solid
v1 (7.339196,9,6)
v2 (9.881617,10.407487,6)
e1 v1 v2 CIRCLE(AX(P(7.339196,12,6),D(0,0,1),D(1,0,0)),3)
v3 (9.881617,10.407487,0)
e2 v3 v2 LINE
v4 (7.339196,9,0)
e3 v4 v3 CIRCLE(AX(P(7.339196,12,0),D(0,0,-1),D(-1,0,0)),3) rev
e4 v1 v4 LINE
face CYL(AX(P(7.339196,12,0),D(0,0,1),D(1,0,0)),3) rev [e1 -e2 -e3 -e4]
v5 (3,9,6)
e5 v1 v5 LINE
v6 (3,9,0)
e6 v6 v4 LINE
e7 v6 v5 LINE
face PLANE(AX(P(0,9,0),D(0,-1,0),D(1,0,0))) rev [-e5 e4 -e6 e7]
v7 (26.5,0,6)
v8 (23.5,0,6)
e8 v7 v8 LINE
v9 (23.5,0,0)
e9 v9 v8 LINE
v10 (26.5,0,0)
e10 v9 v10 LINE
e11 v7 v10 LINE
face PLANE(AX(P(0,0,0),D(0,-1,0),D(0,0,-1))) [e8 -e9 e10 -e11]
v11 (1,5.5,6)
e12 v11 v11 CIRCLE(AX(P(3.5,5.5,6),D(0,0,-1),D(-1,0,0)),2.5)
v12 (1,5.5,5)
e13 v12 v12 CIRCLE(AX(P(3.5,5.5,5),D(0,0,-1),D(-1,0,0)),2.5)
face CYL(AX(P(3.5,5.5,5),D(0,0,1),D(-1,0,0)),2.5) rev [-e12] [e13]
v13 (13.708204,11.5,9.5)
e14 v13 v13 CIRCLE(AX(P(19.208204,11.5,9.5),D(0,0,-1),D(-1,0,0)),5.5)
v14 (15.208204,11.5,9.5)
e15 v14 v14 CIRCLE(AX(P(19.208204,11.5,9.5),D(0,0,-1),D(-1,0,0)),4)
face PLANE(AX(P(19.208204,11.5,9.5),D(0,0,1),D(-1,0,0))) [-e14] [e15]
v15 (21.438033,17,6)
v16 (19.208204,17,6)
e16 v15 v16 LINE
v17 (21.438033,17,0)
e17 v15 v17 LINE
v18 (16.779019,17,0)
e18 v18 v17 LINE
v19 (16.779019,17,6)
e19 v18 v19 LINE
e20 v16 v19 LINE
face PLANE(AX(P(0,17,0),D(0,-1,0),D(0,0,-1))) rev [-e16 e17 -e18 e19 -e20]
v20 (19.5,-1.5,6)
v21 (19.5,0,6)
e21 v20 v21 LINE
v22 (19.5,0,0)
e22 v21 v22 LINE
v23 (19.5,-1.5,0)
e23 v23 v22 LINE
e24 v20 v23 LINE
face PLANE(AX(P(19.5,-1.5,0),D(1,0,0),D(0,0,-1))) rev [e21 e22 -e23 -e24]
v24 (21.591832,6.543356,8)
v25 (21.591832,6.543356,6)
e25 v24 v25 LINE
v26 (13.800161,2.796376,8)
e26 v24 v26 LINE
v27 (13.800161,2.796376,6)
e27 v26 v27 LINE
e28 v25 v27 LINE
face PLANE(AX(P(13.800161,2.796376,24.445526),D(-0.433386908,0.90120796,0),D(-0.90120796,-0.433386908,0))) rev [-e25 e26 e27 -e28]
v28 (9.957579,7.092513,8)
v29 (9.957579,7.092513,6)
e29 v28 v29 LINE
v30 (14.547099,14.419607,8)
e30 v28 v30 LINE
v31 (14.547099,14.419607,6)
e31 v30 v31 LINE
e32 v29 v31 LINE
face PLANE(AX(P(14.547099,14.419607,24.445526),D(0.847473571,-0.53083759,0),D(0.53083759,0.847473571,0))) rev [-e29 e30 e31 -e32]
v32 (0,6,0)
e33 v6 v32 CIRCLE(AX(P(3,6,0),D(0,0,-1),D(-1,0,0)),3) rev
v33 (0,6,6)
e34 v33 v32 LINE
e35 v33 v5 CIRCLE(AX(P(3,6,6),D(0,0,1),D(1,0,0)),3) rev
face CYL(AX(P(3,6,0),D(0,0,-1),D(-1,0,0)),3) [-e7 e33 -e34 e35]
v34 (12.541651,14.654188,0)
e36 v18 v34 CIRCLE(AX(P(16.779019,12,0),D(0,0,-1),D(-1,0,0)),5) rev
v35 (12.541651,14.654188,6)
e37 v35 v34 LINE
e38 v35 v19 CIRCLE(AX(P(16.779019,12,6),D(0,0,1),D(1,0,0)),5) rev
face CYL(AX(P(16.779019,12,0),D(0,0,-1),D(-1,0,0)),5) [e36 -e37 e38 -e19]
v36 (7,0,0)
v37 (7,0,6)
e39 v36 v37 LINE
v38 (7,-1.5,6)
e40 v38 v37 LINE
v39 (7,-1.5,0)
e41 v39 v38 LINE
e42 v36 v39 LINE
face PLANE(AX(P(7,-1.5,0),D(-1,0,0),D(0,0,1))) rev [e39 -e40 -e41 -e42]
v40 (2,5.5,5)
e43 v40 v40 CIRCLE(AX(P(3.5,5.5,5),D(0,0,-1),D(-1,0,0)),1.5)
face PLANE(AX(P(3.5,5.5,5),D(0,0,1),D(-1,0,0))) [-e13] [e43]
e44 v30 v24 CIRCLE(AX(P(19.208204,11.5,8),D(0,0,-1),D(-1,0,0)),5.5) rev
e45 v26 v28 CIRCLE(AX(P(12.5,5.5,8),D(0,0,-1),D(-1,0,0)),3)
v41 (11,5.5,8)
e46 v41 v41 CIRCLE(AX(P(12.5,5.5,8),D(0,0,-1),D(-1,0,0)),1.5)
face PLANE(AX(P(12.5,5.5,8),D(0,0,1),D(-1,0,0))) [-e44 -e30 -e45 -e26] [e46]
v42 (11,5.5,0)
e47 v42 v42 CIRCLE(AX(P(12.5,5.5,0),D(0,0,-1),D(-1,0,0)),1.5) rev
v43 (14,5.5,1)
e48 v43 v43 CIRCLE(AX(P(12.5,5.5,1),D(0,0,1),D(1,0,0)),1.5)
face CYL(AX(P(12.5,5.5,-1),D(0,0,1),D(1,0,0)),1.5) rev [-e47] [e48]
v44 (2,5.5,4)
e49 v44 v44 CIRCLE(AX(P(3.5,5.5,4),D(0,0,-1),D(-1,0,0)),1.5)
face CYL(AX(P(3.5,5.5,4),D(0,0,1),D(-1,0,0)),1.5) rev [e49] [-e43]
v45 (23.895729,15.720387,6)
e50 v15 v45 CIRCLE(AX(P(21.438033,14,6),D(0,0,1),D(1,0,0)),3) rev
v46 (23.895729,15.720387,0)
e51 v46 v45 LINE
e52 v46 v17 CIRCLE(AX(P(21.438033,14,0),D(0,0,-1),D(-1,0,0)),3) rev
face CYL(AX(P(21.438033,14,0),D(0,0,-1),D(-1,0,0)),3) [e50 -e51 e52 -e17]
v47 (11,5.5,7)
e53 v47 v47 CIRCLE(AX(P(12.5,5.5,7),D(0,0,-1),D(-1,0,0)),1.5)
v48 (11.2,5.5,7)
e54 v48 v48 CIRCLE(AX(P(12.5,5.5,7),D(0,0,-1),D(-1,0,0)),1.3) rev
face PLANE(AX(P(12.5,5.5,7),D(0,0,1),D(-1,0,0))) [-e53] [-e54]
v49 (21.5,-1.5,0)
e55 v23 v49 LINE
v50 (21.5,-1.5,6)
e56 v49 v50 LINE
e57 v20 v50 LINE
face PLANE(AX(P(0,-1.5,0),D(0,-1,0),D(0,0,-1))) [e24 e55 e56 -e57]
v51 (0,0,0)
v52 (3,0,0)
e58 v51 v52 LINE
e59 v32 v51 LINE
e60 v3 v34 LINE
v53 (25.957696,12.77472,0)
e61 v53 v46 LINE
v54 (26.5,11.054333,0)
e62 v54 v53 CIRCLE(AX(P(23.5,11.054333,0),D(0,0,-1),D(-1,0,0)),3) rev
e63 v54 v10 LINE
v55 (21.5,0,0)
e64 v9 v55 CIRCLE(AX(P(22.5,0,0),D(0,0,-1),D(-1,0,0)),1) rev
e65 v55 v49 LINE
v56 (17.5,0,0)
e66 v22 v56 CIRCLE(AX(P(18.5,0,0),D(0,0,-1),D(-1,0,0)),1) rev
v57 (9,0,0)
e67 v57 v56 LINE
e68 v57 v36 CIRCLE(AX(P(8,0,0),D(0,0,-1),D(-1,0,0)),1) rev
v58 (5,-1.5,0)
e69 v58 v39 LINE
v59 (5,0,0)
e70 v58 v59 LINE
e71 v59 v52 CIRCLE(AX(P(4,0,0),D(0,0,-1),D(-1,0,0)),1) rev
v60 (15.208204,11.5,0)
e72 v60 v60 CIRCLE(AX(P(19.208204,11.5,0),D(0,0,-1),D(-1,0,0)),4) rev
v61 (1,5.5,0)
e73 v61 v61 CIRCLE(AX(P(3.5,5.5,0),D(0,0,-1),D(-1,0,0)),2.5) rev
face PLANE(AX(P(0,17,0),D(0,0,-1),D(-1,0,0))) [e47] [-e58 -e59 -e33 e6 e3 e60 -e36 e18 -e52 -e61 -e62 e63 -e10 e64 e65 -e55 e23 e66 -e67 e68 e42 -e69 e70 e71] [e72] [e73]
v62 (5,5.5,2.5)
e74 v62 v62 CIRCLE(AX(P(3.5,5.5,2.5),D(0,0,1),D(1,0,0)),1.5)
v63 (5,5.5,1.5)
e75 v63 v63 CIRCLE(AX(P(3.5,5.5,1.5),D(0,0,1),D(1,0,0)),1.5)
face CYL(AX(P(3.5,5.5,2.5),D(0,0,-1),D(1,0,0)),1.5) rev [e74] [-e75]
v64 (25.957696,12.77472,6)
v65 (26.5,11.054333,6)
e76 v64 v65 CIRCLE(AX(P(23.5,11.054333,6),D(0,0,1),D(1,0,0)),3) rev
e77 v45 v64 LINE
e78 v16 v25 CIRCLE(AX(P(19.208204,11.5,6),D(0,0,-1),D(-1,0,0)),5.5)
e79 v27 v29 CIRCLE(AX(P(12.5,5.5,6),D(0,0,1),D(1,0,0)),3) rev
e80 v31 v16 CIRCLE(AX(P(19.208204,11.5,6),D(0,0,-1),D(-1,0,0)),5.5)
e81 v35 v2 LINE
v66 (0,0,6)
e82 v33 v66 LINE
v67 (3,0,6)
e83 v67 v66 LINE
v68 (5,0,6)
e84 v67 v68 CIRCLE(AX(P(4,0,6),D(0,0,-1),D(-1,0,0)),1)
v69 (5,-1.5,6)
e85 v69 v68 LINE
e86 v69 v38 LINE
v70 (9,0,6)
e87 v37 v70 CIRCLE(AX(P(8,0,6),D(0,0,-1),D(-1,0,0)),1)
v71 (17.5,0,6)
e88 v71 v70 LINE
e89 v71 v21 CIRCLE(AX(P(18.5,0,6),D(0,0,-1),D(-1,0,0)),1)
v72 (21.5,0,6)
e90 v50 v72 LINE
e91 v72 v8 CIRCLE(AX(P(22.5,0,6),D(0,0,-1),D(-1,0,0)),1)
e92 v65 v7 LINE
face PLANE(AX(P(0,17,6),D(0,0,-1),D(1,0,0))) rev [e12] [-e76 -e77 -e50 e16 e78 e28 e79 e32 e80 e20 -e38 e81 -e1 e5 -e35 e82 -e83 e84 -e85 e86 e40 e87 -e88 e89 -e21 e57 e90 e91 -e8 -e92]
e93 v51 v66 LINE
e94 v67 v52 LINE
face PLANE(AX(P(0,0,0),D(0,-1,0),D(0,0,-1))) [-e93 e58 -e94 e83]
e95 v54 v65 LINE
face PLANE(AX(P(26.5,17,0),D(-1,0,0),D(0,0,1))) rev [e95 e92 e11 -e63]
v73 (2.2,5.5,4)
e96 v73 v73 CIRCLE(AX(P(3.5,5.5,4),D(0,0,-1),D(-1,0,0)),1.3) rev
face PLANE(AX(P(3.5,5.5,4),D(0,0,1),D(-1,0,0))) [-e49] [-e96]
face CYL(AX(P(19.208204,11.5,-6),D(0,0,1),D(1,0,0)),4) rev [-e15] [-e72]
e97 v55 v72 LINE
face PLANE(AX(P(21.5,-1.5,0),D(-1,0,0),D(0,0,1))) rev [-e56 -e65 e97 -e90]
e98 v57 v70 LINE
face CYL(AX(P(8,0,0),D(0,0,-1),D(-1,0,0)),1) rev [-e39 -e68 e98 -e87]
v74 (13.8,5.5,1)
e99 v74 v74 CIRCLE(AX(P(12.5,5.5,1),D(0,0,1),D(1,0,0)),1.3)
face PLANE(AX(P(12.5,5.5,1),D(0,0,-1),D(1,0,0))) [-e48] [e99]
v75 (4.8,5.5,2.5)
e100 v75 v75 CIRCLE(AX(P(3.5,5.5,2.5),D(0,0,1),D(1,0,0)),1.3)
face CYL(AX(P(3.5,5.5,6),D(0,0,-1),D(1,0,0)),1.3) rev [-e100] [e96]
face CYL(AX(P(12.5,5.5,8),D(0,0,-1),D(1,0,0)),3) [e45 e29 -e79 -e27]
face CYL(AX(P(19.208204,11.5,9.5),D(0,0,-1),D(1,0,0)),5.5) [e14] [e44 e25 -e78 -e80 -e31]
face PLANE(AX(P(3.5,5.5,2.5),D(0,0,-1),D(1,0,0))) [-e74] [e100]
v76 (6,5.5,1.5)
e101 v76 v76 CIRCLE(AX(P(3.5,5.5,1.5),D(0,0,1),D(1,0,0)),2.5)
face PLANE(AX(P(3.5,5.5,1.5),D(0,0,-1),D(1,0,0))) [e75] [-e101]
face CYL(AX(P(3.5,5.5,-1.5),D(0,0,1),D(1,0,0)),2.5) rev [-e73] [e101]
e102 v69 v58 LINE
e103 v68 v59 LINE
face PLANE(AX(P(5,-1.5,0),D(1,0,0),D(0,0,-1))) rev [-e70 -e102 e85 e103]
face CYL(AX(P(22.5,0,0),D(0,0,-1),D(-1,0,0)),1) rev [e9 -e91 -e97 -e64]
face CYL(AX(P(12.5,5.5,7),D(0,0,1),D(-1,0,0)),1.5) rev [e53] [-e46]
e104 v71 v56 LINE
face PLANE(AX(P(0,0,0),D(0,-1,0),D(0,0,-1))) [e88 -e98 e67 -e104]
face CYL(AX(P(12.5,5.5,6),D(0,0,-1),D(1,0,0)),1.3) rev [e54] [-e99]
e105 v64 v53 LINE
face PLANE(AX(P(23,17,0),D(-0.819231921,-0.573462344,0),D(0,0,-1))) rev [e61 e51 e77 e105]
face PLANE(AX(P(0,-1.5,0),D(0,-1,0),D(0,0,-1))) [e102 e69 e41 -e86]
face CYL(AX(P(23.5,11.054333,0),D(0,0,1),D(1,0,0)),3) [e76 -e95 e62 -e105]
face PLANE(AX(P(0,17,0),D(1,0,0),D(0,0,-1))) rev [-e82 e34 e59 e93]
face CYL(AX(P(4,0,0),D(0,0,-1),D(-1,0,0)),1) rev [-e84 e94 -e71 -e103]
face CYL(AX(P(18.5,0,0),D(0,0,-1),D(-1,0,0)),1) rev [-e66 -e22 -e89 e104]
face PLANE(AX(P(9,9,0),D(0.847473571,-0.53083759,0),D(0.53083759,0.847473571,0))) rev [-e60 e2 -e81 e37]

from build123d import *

# Parameters (mm, degrees)
SKETCH1_W             = 26.5
SKETCH1_H             = 6
BOSS_EXTRUDE1_DEPTH   = 17
SKETCH2_R             = 1.5
CUT_EXTRUDE1_DEPTH    = 1
SKETCH3_R             = 1.3
CUT_EXTRUDE2_DEPTH    = 32.878676259
SKETCH4_R             = 4
CUT_EXTRUDE3_DEPTH    = 33.050741021
SKETCH5_R             = 2.5
CUT_EXTRUDE4_DEPTH    = 1.5
SKETCH6_R             = 1.5
CUT_EXTRUDE8_DEPTH    = 1
SKETCH7_R             = 1.3
CUT_EXTRUDE9_DEPTH    = 32.678068123
CUT_EXTRUDE10_START   = -1
SKETCH8_R             = 2.5
CUT_EXTRUDE10_DEPTH   = 1
CUT_EXTRUDE11_START   = -1
SKETCH9_R             = 1.5
CUT_EXTRUDE11_DEPTH   = 1
SKETCH10_R            = 5.5
SKETCH10_R_2          = 4
BOSS_EXTRUDE2_DEPTH   = 3.5
SKETCH11_R            = 3
SKETCH11_R_2          = 1.3
BOSS_EXTRUDE4_DEPTH   = 2
CUT_EXTRUDE12_START   = -1
SKETCH12_R            = 1.5
CUT_EXTRUDE12_DEPTH   = 1
SKETCH17_W            = 2
SKETCH17_H            = 6
BOSS_EXTRUDE6_DEPTH   = 1.5
SKETCH18_R            = 1
CUT_EXTRUDE17_DEPTH   = 33.050741021
CHAMFER2_SIZE         = 5
CHAMFER2_SIZE2        = 3.5
FILLET11_R            = 3
BOSS_EXTRUDE7_DEPTH   = 2
CUT_EXTRUDE19_DEPTH   = 33.050741021
FILLET13_R            = 5
FILLET14_R            = 3
FILLET15_R            = 3
MIRROR6_OUTLINE_R     = 4
MIRROR6_OUTLINE_R_2   = 2.5
MIRROR6_OUTLINE_R_3   = 1.5
MIRROR6_DEPTH         = 6
MIRROR6_START         = 6
MIRROR6_2_OUTLINE_R   = 4
MIRROR6_2_OUTLINE_R_2 = 1.5
MIRROR6_2_DEPTH       = 2
MIRROR6_START_2       = 8
MIRROR6_3_OUTLINE_R   = 5.5
MIRROR6_3_OUTLINE_R_2 = 4
MIRROR6_3_DEPTH       = 1.5
MIRROR6_START_3       = 1.5
MIRROR6_4_OUTLINE_R   = 1.5
MIRROR6_4_OUTLINE_R_2 = 1.3
MIRROR6_4_OUTLINE_R_3 = 2.5
MIRROR6_4_DEPTH       = 3.5
MIRROR6_START_4       = 1
MIRROR6_5_OUTLINE_R   = 1.5
MIRROR6_5_OUTLINE_R_2 = 1.3
MIRROR6_5_DEPTH       = 6
MIRROR6_START_5       = 2.5
MIRROR6_6_OUTLINE_R   = 1.5
MIRROR6_6_OUTLINE_R_2 = 1.3
MIRROR6_6_DEPTH       = 1.5
CUT_EXTRUDE20_DEPTH   = 34.963215396


# Read off the part's stored shape, not the designer's step: Mirror6
with BuildPart() as part:
    # Sketch1 → Boss-Extrude1 (new body)
    with BuildSketch(Plane(origin=(0, 0, 0), x_dir=(1, 0, 0), z_dir=(0, 1, 0))):
        with Locations((13.25, 3)):
            Rectangle(SKETCH1_W, SKETCH1_H)
    extrude(amount=BOSS_EXTRUDE1_DEPTH)

    # Sketch2 → Cut-Extrude1 (cut)
    with BuildSketch(Plane.XY):
        with Locations((12.5, 5.5)):
            Circle(SKETCH2_R)
    extrude(amount=-CUT_EXTRUDE1_DEPTH, mode=Mode.SUBTRACT)

    # Sketch3 → Cut-Extrude2 (cut, through all)
    with BuildSketch(Plane.XY.offset(-1)):
        with Locations((12.5, 5.5)):
            Circle(SKETCH3_R)
    extrude(amount=-CUT_EXTRUDE2_DEPTH, mode=Mode.SUBTRACT)

    # Sketch4 → Cut-Extrude3 (cut, through all)
    with BuildSketch(Plane.XY):
        with Locations((19.208203932, 11.5)):
            Circle(SKETCH4_R)
    extrude(amount=-CUT_EXTRUDE3_DEPTH, mode=Mode.SUBTRACT)

    # Sketch5 → Cut-Extrude4 (cut)
    with BuildSketch(Plane.XY):
        with Locations((3.5, 5.5)):
            Circle(SKETCH5_R)
    extrude(amount=-CUT_EXTRUDE4_DEPTH, mode=Mode.SUBTRACT)

    # Sketch6 → Cut-Extrude8 (cut)
    with BuildSketch(Plane.XY.offset(-1.5)):
        with Locations((3.5, 5.5)):
            Circle(SKETCH6_R)
    extrude(amount=-CUT_EXTRUDE8_DEPTH, mode=Mode.SUBTRACT)

    # Sketch7 → Cut-Extrude9 (cut, through all)
    with BuildSketch(Plane.XY.offset(-2.5)):
        with Locations((3.5, 5.5)):
            Circle(SKETCH7_R)
    extrude(amount=-CUT_EXTRUDE9_DEPTH, mode=Mode.SUBTRACT)

    # Sketch8 → Cut-Extrude10 (cut)
    with BuildSketch(Plane(origin=(0, 0, -6), x_dir=(-1, 0, 0), z_dir=(0, 0, -1)).offset(CUT_EXTRUDE10_START)):
        with Locations(Location((-3.5, 5.5, 0), (0, 0, 180))):
            Circle(SKETCH8_R)
    extrude(amount=CUT_EXTRUDE10_DEPTH, mode=Mode.SUBTRACT)

    # Sketch9 → Cut-Extrude11 (cut)
    with BuildSketch(Plane(origin=(0, 0, -5), x_dir=(-1, 0, 0), z_dir=(0, 0, -1)).offset(CUT_EXTRUDE11_START)):
        with Locations(Location((-3.5, 5.5, 0), (0, 0, 180))):
            Circle(SKETCH9_R)
    extrude(amount=CUT_EXTRUDE11_DEPTH, mode=Mode.SUBTRACT)

    # Sketch10 → Boss-Extrude2 (add)
    with BuildSketch(Plane(origin=(0, 0, -6), x_dir=(-1, 0, 0), z_dir=(0, 0, -1))):
        with Locations(Location((-19.208203932, 11.5, 0), (0, 0, 90))):
            Circle(SKETCH10_R)
        with Locations(Location((-19.208203932, 11.5, 0), (0, 0, 180))):
            Circle(SKETCH10_R_2, mode=Mode.SUBTRACT)
    extrude(amount=BOSS_EXTRUDE2_DEPTH)

    # Sketch11 → Boss-Extrude4 (add)
    with BuildSketch(Plane(origin=(0, 0, -6), x_dir=(-1, 0, 0), z_dir=(0, 0, -1))):
        with Locations(Location((-12.5, 5.5, 0), (0, 0, 180))):
            Circle(SKETCH11_R)
        with Locations(Location((-12.5, 5.5, 0), (0, 0, 180))):
            Circle(SKETCH11_R_2, mode=Mode.SUBTRACT)
    extrude(amount=BOSS_EXTRUDE4_DEPTH)

    # Sketch12 → Cut-Extrude12 (cut)
    with BuildSketch(Plane(origin=(0, 0, -8), x_dir=(-1, 0, 0), z_dir=(0, 0, -1)).offset(CUT_EXTRUDE12_START)):
        with Locations(Location((-12.5, 5.5, 0), (0, 0, 180))):
            Circle(SKETCH12_R)
    extrude(amount=CUT_EXTRUDE12_DEPTH, mode=Mode.SUBTRACT)

    # Sketch17 → Boss-Extrude6 (add)
    with BuildSketch(Plane.XZ):
        with Locations((6, -3)):
            Rectangle(SKETCH17_W, SKETCH17_H)
        with Locations((20.5, -3)):
            Rectangle(SKETCH17_W, SKETCH17_H)
    extrude(amount=BOSS_EXTRUDE6_DEPTH)

    # Sketch18 → Cut-Extrude17 (cut, through all)
    with BuildSketch(Plane(origin=(0, 0, -6), x_dir=(-1, 0, 0), z_dir=(0, 0, -1))):
        with Locations((-22.5, 0)):
            Circle(SKETCH18_R)
        with Locations((-18.5, 0)):
            Circle(SKETCH18_R)
        with Locations((-8, 0)):
            Circle(SKETCH18_R)
        with Locations((-4, 0)):
            Circle(SKETCH18_R)
    extrude(amount=-CUT_EXTRUDE17_DEPTH, mode=Mode.SUBTRACT)

    # Chamfer2
    chamfer2_edges = [part.edges().sort_by_distance(p)[0] for p in [
        (26.5, 17, -3),
    ]]
    chamfer2_side = [part.faces().sort_by_distance(p)[0] for p in [
        (26.5, 8.5, -3),
    ]]
    chamfer(chamfer2_edges, length=CHAMFER2_SIZE, length2=CHAMFER2_SIZE2, reference=chamfer2_side[0])

    # Fillet11
    fillet11_edges = [part.edges().sort_by_distance(p)[0] for p in [
        (23, 17, -3),
        (26.5, 12, -3),
    ]]
    fillet(fillet11_edges, radius=FILLET11_R)

    # Sketch19 → Boss-Extrude7 (add)
    with BuildSketch(Plane(origin=(0, 0, -6), x_dir=(-1, 0, 0), z_dir=(0, 0, -1))):
        with BuildLine():
            Line((-14.547099294, 14.419606745), (-9.957579288, 7.09251277))
            ThreePointArc((-9.957579288, 7.09251277), (-14.736067977, 7.5), (-13.800160725, 2.796376119))
            Line((-13.800160725, 2.796376119), (-21.591831928, 6.543356218))
            ThreePointArc((-21.591831928, 6.543356218), (-15.108745974, 7.833333333), (-14.547099294, 14.419606745))
        make_face()
    extrude(amount=BOSS_EXTRUDE7_DEPTH)

    # Sketch20 → Cut-Extrude19 (cut, through all)
    with BuildSketch(Plane(origin=(0, 0, -6), x_dir=(-1, 0, 0), z_dir=(0, 0, -1))):
        Polygon((0, 17), (-14.011012575, 17), (-9, 9), (0, 9), align=None)
    extrude(amount=-CUT_EXTRUDE19_DEPTH, mode=Mode.SUBTRACT)

    # Fillet13
    fillet13_edges = [part.edges().sort_by_distance(p)[0] for p in [
        (14.011012575, 17, -3),
    ]]
    fillet(fillet13_edges, radius=FILLET13_R)

    # Fillet14
    fillet14_edges = [part.edges().sort_by_distance(p)[0] for p in [
        (9, 9, -3),
    ]]
    fillet(fillet14_edges, radius=FILLET14_R)

    # Fillet15
    fillet15_edges = [part.edges().sort_by_distance(p)[0] for p in [
        (0, 9, -3),
    ]]
    fillet(fillet15_edges, radius=FILLET15_R)

    # Mirror6 outline → Mirror6 (add)
    with BuildSketch(Plane.XY):
        with BuildLine():
            Line((21.438033315, 17), (16.779018718, 17))
            ThreePointArc((16.779018718, 17), (14.357339523, 16.374410803), (12.541650865, 14.65418795))
            Line((12.541650865, 14.65418795), (9.881617026, 10.40748723))
            ThreePointArc((9.881617026, 10.40748723), (8.792203831, 9.375353518), (7.339196314, 9))
            Line((7.339196314, 9), (3, 9))
            ThreePointArc((3, 9), (0.878679656, 8.121320344), (0, 6))
            Line((0, 6), (0, 0))
            Line((0, 0), (3, 0))
            ThreePointArc((3, 0), (4, 1), (5, 0))
            Line((5, 0), (5, -1.5))
            Line((5, -1.5), (7, -1.5))
            Line((7, -1.5), (7, 0))
            ThreePointArc((7, 0), (8, 1), (9, 0))
            Line((9, 0), (17.5, 0))
            ThreePointArc((17.5, 0), (18.5, 1), (19.5, 0))
            Line((19.5, 0), (19.5, -1.5))
            Line((19.5, -1.5), (21.5, -1.5))
            Line((21.5, -1.5), (21.5, 0))
            ThreePointArc((21.5, 0), (22.5, 1), (23.5, 0))
            Line((23.5, 0), (26.5, 0))
            Line((26.5, 0), (26.5, 11.054333308))
            ThreePointArc((26.5, 11.054333308), (26.361213666, 11.956251462), (25.957695762, 12.774720341))
            Line((25.957695762, 12.774720341), (23.895729077, 15.720387033))
            ThreePointArc((23.895729077, 15.720387033), (22.823464458, 16.660936029), (21.438033315, 17))
        make_face()
        with Locations((19.208203932, 11.5)):
            Circle(MIRROR6_OUTLINE_R, mode=Mode.SUBTRACT)
        with Locations((3.5, 5.5)):
            Circle(MIRROR6_OUTLINE_R_2, mode=Mode.SUBTRACT)
        with Locations((12.5, 5.5)):
            Circle(MIRROR6_OUTLINE_R_3, mode=Mode.SUBTRACT)
    extrude(amount=MIRROR6_DEPTH)

    # Mirror6 2 outline → Mirror6 2 (add)
    with BuildSketch(Plane.XY.offset(MIRROR6_START)):
        with BuildLine():
            Line((14.547099293, 14.419606745), (9.957579288, 7.09251277))
            ThreePointArc((9.957579288, 7.09251277), (10.263932023, 3.5), (13.800160725, 2.796376119))
            Line((13.800160725, 2.796376119), (21.591831928, 6.543356218))
            ThreePointArc((21.591831928, 6.543356218), (23.307661891, 15.166666667), (14.547099293, 14.419606745))
        make_face()
        with Locations((19.208203932, 11.5)):
            Circle(MIRROR6_2_OUTLINE_R, mode=Mode.SUBTRACT)
        with Locations((12.5, 5.5)):
            Circle(MIRROR6_2_OUTLINE_R_2, mode=Mode.SUBTRACT)
    extrude(amount=MIRROR6_2_DEPTH)

    # Mirror6 3 outline → Mirror6 3 (add)
    with BuildSketch(Plane.XY.offset(MIRROR6_START_2)):
        with Locations((19.208203932, 11.5)):
            Circle(MIRROR6_3_OUTLINE_R)
        with Locations((19.208203932, 11.5)):
            Circle(MIRROR6_3_OUTLINE_R_2, mode=Mode.SUBTRACT)
    extrude(amount=MIRROR6_3_DEPTH)

    # Mirror6 4 outline → Mirror6 4 (add)
    # profile 1 of 2: a face of its own
    with BuildSketch(Plane.XY.offset(MIRROR6_START_3)):
        with Locations((12.5, 5.5)):
            Circle(MIRROR6_4_OUTLINE_R)
        with Locations((12.5, 5.5)):
            Circle(MIRROR6_4_OUTLINE_R_2, mode=Mode.SUBTRACT)
    # profile 2 of 2: a face of its own
    with BuildSketch(Plane.XY.offset(MIRROR6_START_3)):
        with Locations((3.5, 5.5)):
            Circle(MIRROR6_4_OUTLINE_R_3)
        with Locations((3.5, 5.5)):
            Circle(MIRROR6_4_OUTLINE_R, mode=Mode.SUBTRACT)
    extrude(amount=MIRROR6_4_DEPTH)

    # Mirror6 5 outline → Mirror6 5 (add)
    with BuildSketch(Plane.XY.offset(MIRROR6_START_4)):
        with Locations((12.5, 5.5)):
            Circle(MIRROR6_5_OUTLINE_R)
        with Locations((12.5, 5.5)):
            Circle(MIRROR6_5_OUTLINE_R_2, mode=Mode.SUBTRACT)
    extrude(amount=MIRROR6_5_DEPTH)

    # Mirror6 6 outline → Mirror6 6 (add)
    with BuildSketch(Plane.XY.offset(MIRROR6_START_5)):
        with Locations((3.5, 5.5)):
            Circle(MIRROR6_6_OUTLINE_R)
        with Locations((3.5, 5.5)):
            Circle(MIRROR6_6_OUTLINE_R_2, mode=Mode.SUBTRACT)
    extrude(amount=MIRROR6_6_DEPTH)

    # Sketch24 → Cut-Extrude20 (cut, through all)
    with BuildSketch(Plane(origin=(0, -2, 0), x_dir=(1, 0, 0), z_dir=(0, 1, 0))):
        Polygon((0, 0), (26.5, 0), (26.5, 6), (26.5, 9.5), (24.708203932, 9.5), (13.708203932, 9.5), (0, 9.5), (0, 6), align=None)
    extrude(amount=CUT_EXTRUDE20_DEPTH, mode=Mode.SUBTRACT)


solid = part.part
